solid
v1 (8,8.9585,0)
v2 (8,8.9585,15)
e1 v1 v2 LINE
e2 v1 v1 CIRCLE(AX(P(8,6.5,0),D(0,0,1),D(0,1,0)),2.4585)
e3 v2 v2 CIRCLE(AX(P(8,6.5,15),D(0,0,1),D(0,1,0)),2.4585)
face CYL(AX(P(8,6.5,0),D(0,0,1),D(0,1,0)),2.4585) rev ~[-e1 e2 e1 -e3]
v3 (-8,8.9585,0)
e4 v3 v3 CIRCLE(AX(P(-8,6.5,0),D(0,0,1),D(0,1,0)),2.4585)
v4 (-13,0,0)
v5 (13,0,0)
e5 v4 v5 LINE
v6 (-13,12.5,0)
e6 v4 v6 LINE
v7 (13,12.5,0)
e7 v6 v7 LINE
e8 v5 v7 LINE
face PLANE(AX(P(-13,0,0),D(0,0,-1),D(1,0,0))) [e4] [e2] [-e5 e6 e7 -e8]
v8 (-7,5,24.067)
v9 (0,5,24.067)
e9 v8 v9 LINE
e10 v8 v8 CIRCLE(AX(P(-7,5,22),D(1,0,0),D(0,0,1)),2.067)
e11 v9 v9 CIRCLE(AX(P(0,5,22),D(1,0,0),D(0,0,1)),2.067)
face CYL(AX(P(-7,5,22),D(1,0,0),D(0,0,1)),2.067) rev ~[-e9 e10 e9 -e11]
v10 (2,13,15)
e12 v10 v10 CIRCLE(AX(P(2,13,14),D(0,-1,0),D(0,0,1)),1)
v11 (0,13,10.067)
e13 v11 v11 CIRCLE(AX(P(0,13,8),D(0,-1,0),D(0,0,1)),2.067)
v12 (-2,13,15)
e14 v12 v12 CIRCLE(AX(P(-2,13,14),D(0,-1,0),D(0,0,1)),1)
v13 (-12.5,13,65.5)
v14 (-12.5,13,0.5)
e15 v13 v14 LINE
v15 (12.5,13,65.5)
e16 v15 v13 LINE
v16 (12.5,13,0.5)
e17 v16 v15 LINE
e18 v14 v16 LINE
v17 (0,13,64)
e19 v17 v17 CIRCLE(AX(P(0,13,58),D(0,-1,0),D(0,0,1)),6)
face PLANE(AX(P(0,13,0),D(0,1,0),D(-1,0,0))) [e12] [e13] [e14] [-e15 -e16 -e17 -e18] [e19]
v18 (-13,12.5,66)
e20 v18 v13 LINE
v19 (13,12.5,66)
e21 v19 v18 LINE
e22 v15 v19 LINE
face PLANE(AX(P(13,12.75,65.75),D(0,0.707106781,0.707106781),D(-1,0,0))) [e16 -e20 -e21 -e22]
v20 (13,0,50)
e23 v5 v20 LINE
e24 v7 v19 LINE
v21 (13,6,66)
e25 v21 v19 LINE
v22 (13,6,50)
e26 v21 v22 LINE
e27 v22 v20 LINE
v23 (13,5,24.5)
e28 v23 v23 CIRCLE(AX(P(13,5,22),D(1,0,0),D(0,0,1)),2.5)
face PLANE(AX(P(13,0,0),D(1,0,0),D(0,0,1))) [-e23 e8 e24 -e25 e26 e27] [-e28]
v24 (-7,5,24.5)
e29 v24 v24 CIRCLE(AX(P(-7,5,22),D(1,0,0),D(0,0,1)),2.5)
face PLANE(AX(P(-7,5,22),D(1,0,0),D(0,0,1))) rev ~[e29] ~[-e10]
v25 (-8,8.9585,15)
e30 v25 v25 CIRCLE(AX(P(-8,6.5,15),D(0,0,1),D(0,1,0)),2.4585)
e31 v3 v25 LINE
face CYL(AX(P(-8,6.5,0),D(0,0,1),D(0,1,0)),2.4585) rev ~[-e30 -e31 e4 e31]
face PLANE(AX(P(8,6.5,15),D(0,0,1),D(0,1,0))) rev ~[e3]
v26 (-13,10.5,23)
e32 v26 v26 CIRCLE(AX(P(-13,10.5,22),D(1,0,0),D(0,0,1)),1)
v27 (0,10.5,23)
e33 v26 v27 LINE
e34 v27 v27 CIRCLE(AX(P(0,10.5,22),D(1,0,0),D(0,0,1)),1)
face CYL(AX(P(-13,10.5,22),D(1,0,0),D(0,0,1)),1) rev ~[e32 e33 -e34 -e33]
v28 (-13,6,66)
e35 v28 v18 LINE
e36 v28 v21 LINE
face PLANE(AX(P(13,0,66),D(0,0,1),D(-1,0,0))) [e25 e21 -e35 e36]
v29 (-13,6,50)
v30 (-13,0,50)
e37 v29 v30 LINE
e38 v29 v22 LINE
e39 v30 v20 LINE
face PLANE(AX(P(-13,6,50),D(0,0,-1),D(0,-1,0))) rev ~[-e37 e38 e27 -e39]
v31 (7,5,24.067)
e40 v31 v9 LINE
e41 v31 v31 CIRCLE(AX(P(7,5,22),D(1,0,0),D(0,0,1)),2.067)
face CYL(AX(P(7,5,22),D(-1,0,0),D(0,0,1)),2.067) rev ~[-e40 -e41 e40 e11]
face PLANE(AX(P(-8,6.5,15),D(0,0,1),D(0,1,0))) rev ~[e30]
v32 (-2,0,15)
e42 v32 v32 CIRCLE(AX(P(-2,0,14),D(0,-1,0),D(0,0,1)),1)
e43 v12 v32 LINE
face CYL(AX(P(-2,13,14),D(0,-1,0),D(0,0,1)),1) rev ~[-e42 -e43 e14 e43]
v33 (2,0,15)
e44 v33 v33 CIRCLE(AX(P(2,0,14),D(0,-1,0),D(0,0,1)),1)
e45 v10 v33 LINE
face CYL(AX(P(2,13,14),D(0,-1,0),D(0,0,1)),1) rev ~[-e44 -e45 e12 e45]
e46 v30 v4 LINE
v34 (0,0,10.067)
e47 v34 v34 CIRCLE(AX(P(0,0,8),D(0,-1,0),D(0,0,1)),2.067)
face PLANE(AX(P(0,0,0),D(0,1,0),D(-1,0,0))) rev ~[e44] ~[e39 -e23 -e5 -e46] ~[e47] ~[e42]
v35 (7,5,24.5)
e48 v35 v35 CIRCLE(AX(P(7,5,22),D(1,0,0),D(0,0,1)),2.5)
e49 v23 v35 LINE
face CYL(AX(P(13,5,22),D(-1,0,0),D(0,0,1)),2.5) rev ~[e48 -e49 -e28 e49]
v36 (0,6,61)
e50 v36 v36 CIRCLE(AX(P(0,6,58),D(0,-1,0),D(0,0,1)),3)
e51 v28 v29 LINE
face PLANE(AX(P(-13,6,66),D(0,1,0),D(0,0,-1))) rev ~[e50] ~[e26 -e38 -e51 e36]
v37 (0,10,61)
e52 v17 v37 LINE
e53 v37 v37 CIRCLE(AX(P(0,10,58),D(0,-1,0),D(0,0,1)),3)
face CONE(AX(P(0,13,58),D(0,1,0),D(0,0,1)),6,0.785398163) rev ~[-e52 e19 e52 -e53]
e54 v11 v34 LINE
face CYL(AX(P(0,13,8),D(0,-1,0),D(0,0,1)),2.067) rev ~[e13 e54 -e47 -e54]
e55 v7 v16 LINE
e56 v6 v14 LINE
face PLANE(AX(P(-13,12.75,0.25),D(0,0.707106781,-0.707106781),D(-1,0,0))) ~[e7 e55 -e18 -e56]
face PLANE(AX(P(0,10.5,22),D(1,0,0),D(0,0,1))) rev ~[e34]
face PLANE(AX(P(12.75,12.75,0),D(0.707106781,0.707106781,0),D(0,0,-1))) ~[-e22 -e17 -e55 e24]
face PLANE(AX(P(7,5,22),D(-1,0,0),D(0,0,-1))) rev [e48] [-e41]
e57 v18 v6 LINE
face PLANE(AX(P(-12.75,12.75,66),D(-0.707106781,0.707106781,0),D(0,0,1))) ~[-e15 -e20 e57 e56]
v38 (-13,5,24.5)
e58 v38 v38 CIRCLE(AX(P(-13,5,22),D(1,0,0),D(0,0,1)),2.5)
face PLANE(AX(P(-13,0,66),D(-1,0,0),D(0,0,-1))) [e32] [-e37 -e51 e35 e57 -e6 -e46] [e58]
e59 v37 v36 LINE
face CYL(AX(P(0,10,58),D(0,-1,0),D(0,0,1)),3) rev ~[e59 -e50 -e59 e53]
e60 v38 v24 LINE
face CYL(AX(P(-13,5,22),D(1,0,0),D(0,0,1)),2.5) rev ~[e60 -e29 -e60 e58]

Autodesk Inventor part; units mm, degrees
ref_plane "YZ Plane" through (0, 0, 0) normal (1, 0, 0) x (0, 1, 0)
ref_plane "XZ Plane" through (0, 0, 0) normal (0, 1, 0) x (-1, 0, 0)
ref_plane "XY Plane" through (0, 0, 0) normal (0, 0, 1) x (1, 0, 0)
sketch "Skizze1" plane through (0, 0, 0) normal (0, 1, 0) x (-1, 0, 0)
  line L0 (13, 0) -> (-13, 0)
  line L1 (-13, 0) -> (-13, 66)
  line L2 (-13, 66) -> (13, 66)
  line L3 (13, 66) -> (13, 0)
  point P0 (0, 0)
  point P1 (0, 0)
  dimension "d0" = 66
  dimension "d1" = 26
extrude "Extrusion1" add sketch "Skizze1" along normal blind 13
sketch "Skizze2" plane through (-13, 0, 0) normal (-1, 0, 0) x (0, 0, 1)
  line L0 (66, 0) -> (66, 13) projected
  line L1 (66, 6) -> (50, 6)
  line L2 (0, 13) -> (66, 13) projected
  line L3 (50, 6) -> (50, 0)
  line L4 (50, 0) -> (66, 0)
  line L5 (66, 6) -> (66, 0)
  point P0 (0, 0)
  dimension "d4" = 7
  dimension "d5" = 16
extrude "Extrusion2" cut sketch "Skizze2" against normal up to surface (26 mm away)
sketch "Skizze3" plane through (0, 13, 0) normal (0, 1, 0) x (1, 0, 0)
  line L0 (-13, -66) -> (13, -66) projected
  line L1 (13, 0) -> (-13, 0) projected
  point P0 (0, 0)
  point P1 (0, -58)
  point P2 (0, 0)
  dimension "d8" = 8
hole "Bohrung1" at (0, 13, 58) direction (0, -1, 0) diameter 6 depth 7 countersink diameter 12 countersink angle 90
sketch "Skizze4" plane through (0, 13, 0) normal (0, 1, 0) x (1, 0, 0)
  line L0 (13, 0) -> (-13, 0) projected
  point P0 (0, 0)
  point P1 (0, -8)
  point P2 (0, 0)
  point P3 (0, 0)
  dimension "d23" = 8
hole "Bohrung2" at (0, 13, 8) direction (0, -1, 0) diameter 4.134 depth 13 thread size "M5x0.8" class "6H" standard "ISO Metric profile"
sketch "Skizze5" plane through (0, 13, 0) normal (0, 1, 0) x (1, 0, 0)
  line L0 (13, 0) -> (-13, 0) projected
  point P0 (0, 0)
  point P1 (2, -14)
  point P2 (-2, -14)
  point P3 (0, 0)
  point P4 (0, 0)
  dimension "d31" = 2
  dimension "d32" = 2
  dimension "d33" = 14
  dimension "d34" = 14
hole "Bohrung3" at (2, 13, 14) at (-2, 13, 14) direction (0, -1, 0) diameter 2 depth 13
sketch "Skizze6" plane through (-13, 0, 0) normal (-1, 0, 0) x (0, 0, 1)
  line L0 (0, 0) -> (50, 0) projected
  point P0 (22, 10.5)
  point P1 (22, 5)
  dimension "d42" = 22
  dimension "d43" = 5
  dimension "d44" = 5.5
hole "Bohrung4" at (-13, 5, 22) direction (1, 0, 0) diameter 4.134 depth 13 counterbore diameter 5 counterbore depth 6 thread size "M5x0.8" class "6H" standard "ISO Metric profile"
hole "Bohrung5" at (-13, 10.5, 22) direction (1, 0, 0) diameter 2 depth 13
mirror "Spiegeln1" about plane through (0, 0, 0) normal (1, 0, 0) of "Bohrung4"
chamfer "Fasen1" distance 0.5 angle 45 4 edges at (-13, 13, 33) (0, 13, 66) (13, 13, 33) (0, 13, 0)
sketch "Skizze7" plane through (13, 0, 0) normal (0, 0, -1) x (-1, 0, 0)
  line L0 (0, 0) -> (0, 12.5) projected
  line L1 (0, 0) -> (26, 0) projected
  point P0 (13, 0)
  point P1 (5, 6.5)
  point P2 (21, 6.5)
  point P3 (0, 6.25)
  point P4 (0, 6.25)
  dimension "d62" = 5
  dimension "d63" = 16
  dimension "d64" = 6.5
hole "Bohrung6" at (8, 6.5, 0) at (-8, 6.5, 0) direction (0, 0, 1) diameter 4.917 depth 15 thread size "M6x1" class "6H" standard "ISO Metric profile"
properties part number "support" material "Aluminium 6061"
